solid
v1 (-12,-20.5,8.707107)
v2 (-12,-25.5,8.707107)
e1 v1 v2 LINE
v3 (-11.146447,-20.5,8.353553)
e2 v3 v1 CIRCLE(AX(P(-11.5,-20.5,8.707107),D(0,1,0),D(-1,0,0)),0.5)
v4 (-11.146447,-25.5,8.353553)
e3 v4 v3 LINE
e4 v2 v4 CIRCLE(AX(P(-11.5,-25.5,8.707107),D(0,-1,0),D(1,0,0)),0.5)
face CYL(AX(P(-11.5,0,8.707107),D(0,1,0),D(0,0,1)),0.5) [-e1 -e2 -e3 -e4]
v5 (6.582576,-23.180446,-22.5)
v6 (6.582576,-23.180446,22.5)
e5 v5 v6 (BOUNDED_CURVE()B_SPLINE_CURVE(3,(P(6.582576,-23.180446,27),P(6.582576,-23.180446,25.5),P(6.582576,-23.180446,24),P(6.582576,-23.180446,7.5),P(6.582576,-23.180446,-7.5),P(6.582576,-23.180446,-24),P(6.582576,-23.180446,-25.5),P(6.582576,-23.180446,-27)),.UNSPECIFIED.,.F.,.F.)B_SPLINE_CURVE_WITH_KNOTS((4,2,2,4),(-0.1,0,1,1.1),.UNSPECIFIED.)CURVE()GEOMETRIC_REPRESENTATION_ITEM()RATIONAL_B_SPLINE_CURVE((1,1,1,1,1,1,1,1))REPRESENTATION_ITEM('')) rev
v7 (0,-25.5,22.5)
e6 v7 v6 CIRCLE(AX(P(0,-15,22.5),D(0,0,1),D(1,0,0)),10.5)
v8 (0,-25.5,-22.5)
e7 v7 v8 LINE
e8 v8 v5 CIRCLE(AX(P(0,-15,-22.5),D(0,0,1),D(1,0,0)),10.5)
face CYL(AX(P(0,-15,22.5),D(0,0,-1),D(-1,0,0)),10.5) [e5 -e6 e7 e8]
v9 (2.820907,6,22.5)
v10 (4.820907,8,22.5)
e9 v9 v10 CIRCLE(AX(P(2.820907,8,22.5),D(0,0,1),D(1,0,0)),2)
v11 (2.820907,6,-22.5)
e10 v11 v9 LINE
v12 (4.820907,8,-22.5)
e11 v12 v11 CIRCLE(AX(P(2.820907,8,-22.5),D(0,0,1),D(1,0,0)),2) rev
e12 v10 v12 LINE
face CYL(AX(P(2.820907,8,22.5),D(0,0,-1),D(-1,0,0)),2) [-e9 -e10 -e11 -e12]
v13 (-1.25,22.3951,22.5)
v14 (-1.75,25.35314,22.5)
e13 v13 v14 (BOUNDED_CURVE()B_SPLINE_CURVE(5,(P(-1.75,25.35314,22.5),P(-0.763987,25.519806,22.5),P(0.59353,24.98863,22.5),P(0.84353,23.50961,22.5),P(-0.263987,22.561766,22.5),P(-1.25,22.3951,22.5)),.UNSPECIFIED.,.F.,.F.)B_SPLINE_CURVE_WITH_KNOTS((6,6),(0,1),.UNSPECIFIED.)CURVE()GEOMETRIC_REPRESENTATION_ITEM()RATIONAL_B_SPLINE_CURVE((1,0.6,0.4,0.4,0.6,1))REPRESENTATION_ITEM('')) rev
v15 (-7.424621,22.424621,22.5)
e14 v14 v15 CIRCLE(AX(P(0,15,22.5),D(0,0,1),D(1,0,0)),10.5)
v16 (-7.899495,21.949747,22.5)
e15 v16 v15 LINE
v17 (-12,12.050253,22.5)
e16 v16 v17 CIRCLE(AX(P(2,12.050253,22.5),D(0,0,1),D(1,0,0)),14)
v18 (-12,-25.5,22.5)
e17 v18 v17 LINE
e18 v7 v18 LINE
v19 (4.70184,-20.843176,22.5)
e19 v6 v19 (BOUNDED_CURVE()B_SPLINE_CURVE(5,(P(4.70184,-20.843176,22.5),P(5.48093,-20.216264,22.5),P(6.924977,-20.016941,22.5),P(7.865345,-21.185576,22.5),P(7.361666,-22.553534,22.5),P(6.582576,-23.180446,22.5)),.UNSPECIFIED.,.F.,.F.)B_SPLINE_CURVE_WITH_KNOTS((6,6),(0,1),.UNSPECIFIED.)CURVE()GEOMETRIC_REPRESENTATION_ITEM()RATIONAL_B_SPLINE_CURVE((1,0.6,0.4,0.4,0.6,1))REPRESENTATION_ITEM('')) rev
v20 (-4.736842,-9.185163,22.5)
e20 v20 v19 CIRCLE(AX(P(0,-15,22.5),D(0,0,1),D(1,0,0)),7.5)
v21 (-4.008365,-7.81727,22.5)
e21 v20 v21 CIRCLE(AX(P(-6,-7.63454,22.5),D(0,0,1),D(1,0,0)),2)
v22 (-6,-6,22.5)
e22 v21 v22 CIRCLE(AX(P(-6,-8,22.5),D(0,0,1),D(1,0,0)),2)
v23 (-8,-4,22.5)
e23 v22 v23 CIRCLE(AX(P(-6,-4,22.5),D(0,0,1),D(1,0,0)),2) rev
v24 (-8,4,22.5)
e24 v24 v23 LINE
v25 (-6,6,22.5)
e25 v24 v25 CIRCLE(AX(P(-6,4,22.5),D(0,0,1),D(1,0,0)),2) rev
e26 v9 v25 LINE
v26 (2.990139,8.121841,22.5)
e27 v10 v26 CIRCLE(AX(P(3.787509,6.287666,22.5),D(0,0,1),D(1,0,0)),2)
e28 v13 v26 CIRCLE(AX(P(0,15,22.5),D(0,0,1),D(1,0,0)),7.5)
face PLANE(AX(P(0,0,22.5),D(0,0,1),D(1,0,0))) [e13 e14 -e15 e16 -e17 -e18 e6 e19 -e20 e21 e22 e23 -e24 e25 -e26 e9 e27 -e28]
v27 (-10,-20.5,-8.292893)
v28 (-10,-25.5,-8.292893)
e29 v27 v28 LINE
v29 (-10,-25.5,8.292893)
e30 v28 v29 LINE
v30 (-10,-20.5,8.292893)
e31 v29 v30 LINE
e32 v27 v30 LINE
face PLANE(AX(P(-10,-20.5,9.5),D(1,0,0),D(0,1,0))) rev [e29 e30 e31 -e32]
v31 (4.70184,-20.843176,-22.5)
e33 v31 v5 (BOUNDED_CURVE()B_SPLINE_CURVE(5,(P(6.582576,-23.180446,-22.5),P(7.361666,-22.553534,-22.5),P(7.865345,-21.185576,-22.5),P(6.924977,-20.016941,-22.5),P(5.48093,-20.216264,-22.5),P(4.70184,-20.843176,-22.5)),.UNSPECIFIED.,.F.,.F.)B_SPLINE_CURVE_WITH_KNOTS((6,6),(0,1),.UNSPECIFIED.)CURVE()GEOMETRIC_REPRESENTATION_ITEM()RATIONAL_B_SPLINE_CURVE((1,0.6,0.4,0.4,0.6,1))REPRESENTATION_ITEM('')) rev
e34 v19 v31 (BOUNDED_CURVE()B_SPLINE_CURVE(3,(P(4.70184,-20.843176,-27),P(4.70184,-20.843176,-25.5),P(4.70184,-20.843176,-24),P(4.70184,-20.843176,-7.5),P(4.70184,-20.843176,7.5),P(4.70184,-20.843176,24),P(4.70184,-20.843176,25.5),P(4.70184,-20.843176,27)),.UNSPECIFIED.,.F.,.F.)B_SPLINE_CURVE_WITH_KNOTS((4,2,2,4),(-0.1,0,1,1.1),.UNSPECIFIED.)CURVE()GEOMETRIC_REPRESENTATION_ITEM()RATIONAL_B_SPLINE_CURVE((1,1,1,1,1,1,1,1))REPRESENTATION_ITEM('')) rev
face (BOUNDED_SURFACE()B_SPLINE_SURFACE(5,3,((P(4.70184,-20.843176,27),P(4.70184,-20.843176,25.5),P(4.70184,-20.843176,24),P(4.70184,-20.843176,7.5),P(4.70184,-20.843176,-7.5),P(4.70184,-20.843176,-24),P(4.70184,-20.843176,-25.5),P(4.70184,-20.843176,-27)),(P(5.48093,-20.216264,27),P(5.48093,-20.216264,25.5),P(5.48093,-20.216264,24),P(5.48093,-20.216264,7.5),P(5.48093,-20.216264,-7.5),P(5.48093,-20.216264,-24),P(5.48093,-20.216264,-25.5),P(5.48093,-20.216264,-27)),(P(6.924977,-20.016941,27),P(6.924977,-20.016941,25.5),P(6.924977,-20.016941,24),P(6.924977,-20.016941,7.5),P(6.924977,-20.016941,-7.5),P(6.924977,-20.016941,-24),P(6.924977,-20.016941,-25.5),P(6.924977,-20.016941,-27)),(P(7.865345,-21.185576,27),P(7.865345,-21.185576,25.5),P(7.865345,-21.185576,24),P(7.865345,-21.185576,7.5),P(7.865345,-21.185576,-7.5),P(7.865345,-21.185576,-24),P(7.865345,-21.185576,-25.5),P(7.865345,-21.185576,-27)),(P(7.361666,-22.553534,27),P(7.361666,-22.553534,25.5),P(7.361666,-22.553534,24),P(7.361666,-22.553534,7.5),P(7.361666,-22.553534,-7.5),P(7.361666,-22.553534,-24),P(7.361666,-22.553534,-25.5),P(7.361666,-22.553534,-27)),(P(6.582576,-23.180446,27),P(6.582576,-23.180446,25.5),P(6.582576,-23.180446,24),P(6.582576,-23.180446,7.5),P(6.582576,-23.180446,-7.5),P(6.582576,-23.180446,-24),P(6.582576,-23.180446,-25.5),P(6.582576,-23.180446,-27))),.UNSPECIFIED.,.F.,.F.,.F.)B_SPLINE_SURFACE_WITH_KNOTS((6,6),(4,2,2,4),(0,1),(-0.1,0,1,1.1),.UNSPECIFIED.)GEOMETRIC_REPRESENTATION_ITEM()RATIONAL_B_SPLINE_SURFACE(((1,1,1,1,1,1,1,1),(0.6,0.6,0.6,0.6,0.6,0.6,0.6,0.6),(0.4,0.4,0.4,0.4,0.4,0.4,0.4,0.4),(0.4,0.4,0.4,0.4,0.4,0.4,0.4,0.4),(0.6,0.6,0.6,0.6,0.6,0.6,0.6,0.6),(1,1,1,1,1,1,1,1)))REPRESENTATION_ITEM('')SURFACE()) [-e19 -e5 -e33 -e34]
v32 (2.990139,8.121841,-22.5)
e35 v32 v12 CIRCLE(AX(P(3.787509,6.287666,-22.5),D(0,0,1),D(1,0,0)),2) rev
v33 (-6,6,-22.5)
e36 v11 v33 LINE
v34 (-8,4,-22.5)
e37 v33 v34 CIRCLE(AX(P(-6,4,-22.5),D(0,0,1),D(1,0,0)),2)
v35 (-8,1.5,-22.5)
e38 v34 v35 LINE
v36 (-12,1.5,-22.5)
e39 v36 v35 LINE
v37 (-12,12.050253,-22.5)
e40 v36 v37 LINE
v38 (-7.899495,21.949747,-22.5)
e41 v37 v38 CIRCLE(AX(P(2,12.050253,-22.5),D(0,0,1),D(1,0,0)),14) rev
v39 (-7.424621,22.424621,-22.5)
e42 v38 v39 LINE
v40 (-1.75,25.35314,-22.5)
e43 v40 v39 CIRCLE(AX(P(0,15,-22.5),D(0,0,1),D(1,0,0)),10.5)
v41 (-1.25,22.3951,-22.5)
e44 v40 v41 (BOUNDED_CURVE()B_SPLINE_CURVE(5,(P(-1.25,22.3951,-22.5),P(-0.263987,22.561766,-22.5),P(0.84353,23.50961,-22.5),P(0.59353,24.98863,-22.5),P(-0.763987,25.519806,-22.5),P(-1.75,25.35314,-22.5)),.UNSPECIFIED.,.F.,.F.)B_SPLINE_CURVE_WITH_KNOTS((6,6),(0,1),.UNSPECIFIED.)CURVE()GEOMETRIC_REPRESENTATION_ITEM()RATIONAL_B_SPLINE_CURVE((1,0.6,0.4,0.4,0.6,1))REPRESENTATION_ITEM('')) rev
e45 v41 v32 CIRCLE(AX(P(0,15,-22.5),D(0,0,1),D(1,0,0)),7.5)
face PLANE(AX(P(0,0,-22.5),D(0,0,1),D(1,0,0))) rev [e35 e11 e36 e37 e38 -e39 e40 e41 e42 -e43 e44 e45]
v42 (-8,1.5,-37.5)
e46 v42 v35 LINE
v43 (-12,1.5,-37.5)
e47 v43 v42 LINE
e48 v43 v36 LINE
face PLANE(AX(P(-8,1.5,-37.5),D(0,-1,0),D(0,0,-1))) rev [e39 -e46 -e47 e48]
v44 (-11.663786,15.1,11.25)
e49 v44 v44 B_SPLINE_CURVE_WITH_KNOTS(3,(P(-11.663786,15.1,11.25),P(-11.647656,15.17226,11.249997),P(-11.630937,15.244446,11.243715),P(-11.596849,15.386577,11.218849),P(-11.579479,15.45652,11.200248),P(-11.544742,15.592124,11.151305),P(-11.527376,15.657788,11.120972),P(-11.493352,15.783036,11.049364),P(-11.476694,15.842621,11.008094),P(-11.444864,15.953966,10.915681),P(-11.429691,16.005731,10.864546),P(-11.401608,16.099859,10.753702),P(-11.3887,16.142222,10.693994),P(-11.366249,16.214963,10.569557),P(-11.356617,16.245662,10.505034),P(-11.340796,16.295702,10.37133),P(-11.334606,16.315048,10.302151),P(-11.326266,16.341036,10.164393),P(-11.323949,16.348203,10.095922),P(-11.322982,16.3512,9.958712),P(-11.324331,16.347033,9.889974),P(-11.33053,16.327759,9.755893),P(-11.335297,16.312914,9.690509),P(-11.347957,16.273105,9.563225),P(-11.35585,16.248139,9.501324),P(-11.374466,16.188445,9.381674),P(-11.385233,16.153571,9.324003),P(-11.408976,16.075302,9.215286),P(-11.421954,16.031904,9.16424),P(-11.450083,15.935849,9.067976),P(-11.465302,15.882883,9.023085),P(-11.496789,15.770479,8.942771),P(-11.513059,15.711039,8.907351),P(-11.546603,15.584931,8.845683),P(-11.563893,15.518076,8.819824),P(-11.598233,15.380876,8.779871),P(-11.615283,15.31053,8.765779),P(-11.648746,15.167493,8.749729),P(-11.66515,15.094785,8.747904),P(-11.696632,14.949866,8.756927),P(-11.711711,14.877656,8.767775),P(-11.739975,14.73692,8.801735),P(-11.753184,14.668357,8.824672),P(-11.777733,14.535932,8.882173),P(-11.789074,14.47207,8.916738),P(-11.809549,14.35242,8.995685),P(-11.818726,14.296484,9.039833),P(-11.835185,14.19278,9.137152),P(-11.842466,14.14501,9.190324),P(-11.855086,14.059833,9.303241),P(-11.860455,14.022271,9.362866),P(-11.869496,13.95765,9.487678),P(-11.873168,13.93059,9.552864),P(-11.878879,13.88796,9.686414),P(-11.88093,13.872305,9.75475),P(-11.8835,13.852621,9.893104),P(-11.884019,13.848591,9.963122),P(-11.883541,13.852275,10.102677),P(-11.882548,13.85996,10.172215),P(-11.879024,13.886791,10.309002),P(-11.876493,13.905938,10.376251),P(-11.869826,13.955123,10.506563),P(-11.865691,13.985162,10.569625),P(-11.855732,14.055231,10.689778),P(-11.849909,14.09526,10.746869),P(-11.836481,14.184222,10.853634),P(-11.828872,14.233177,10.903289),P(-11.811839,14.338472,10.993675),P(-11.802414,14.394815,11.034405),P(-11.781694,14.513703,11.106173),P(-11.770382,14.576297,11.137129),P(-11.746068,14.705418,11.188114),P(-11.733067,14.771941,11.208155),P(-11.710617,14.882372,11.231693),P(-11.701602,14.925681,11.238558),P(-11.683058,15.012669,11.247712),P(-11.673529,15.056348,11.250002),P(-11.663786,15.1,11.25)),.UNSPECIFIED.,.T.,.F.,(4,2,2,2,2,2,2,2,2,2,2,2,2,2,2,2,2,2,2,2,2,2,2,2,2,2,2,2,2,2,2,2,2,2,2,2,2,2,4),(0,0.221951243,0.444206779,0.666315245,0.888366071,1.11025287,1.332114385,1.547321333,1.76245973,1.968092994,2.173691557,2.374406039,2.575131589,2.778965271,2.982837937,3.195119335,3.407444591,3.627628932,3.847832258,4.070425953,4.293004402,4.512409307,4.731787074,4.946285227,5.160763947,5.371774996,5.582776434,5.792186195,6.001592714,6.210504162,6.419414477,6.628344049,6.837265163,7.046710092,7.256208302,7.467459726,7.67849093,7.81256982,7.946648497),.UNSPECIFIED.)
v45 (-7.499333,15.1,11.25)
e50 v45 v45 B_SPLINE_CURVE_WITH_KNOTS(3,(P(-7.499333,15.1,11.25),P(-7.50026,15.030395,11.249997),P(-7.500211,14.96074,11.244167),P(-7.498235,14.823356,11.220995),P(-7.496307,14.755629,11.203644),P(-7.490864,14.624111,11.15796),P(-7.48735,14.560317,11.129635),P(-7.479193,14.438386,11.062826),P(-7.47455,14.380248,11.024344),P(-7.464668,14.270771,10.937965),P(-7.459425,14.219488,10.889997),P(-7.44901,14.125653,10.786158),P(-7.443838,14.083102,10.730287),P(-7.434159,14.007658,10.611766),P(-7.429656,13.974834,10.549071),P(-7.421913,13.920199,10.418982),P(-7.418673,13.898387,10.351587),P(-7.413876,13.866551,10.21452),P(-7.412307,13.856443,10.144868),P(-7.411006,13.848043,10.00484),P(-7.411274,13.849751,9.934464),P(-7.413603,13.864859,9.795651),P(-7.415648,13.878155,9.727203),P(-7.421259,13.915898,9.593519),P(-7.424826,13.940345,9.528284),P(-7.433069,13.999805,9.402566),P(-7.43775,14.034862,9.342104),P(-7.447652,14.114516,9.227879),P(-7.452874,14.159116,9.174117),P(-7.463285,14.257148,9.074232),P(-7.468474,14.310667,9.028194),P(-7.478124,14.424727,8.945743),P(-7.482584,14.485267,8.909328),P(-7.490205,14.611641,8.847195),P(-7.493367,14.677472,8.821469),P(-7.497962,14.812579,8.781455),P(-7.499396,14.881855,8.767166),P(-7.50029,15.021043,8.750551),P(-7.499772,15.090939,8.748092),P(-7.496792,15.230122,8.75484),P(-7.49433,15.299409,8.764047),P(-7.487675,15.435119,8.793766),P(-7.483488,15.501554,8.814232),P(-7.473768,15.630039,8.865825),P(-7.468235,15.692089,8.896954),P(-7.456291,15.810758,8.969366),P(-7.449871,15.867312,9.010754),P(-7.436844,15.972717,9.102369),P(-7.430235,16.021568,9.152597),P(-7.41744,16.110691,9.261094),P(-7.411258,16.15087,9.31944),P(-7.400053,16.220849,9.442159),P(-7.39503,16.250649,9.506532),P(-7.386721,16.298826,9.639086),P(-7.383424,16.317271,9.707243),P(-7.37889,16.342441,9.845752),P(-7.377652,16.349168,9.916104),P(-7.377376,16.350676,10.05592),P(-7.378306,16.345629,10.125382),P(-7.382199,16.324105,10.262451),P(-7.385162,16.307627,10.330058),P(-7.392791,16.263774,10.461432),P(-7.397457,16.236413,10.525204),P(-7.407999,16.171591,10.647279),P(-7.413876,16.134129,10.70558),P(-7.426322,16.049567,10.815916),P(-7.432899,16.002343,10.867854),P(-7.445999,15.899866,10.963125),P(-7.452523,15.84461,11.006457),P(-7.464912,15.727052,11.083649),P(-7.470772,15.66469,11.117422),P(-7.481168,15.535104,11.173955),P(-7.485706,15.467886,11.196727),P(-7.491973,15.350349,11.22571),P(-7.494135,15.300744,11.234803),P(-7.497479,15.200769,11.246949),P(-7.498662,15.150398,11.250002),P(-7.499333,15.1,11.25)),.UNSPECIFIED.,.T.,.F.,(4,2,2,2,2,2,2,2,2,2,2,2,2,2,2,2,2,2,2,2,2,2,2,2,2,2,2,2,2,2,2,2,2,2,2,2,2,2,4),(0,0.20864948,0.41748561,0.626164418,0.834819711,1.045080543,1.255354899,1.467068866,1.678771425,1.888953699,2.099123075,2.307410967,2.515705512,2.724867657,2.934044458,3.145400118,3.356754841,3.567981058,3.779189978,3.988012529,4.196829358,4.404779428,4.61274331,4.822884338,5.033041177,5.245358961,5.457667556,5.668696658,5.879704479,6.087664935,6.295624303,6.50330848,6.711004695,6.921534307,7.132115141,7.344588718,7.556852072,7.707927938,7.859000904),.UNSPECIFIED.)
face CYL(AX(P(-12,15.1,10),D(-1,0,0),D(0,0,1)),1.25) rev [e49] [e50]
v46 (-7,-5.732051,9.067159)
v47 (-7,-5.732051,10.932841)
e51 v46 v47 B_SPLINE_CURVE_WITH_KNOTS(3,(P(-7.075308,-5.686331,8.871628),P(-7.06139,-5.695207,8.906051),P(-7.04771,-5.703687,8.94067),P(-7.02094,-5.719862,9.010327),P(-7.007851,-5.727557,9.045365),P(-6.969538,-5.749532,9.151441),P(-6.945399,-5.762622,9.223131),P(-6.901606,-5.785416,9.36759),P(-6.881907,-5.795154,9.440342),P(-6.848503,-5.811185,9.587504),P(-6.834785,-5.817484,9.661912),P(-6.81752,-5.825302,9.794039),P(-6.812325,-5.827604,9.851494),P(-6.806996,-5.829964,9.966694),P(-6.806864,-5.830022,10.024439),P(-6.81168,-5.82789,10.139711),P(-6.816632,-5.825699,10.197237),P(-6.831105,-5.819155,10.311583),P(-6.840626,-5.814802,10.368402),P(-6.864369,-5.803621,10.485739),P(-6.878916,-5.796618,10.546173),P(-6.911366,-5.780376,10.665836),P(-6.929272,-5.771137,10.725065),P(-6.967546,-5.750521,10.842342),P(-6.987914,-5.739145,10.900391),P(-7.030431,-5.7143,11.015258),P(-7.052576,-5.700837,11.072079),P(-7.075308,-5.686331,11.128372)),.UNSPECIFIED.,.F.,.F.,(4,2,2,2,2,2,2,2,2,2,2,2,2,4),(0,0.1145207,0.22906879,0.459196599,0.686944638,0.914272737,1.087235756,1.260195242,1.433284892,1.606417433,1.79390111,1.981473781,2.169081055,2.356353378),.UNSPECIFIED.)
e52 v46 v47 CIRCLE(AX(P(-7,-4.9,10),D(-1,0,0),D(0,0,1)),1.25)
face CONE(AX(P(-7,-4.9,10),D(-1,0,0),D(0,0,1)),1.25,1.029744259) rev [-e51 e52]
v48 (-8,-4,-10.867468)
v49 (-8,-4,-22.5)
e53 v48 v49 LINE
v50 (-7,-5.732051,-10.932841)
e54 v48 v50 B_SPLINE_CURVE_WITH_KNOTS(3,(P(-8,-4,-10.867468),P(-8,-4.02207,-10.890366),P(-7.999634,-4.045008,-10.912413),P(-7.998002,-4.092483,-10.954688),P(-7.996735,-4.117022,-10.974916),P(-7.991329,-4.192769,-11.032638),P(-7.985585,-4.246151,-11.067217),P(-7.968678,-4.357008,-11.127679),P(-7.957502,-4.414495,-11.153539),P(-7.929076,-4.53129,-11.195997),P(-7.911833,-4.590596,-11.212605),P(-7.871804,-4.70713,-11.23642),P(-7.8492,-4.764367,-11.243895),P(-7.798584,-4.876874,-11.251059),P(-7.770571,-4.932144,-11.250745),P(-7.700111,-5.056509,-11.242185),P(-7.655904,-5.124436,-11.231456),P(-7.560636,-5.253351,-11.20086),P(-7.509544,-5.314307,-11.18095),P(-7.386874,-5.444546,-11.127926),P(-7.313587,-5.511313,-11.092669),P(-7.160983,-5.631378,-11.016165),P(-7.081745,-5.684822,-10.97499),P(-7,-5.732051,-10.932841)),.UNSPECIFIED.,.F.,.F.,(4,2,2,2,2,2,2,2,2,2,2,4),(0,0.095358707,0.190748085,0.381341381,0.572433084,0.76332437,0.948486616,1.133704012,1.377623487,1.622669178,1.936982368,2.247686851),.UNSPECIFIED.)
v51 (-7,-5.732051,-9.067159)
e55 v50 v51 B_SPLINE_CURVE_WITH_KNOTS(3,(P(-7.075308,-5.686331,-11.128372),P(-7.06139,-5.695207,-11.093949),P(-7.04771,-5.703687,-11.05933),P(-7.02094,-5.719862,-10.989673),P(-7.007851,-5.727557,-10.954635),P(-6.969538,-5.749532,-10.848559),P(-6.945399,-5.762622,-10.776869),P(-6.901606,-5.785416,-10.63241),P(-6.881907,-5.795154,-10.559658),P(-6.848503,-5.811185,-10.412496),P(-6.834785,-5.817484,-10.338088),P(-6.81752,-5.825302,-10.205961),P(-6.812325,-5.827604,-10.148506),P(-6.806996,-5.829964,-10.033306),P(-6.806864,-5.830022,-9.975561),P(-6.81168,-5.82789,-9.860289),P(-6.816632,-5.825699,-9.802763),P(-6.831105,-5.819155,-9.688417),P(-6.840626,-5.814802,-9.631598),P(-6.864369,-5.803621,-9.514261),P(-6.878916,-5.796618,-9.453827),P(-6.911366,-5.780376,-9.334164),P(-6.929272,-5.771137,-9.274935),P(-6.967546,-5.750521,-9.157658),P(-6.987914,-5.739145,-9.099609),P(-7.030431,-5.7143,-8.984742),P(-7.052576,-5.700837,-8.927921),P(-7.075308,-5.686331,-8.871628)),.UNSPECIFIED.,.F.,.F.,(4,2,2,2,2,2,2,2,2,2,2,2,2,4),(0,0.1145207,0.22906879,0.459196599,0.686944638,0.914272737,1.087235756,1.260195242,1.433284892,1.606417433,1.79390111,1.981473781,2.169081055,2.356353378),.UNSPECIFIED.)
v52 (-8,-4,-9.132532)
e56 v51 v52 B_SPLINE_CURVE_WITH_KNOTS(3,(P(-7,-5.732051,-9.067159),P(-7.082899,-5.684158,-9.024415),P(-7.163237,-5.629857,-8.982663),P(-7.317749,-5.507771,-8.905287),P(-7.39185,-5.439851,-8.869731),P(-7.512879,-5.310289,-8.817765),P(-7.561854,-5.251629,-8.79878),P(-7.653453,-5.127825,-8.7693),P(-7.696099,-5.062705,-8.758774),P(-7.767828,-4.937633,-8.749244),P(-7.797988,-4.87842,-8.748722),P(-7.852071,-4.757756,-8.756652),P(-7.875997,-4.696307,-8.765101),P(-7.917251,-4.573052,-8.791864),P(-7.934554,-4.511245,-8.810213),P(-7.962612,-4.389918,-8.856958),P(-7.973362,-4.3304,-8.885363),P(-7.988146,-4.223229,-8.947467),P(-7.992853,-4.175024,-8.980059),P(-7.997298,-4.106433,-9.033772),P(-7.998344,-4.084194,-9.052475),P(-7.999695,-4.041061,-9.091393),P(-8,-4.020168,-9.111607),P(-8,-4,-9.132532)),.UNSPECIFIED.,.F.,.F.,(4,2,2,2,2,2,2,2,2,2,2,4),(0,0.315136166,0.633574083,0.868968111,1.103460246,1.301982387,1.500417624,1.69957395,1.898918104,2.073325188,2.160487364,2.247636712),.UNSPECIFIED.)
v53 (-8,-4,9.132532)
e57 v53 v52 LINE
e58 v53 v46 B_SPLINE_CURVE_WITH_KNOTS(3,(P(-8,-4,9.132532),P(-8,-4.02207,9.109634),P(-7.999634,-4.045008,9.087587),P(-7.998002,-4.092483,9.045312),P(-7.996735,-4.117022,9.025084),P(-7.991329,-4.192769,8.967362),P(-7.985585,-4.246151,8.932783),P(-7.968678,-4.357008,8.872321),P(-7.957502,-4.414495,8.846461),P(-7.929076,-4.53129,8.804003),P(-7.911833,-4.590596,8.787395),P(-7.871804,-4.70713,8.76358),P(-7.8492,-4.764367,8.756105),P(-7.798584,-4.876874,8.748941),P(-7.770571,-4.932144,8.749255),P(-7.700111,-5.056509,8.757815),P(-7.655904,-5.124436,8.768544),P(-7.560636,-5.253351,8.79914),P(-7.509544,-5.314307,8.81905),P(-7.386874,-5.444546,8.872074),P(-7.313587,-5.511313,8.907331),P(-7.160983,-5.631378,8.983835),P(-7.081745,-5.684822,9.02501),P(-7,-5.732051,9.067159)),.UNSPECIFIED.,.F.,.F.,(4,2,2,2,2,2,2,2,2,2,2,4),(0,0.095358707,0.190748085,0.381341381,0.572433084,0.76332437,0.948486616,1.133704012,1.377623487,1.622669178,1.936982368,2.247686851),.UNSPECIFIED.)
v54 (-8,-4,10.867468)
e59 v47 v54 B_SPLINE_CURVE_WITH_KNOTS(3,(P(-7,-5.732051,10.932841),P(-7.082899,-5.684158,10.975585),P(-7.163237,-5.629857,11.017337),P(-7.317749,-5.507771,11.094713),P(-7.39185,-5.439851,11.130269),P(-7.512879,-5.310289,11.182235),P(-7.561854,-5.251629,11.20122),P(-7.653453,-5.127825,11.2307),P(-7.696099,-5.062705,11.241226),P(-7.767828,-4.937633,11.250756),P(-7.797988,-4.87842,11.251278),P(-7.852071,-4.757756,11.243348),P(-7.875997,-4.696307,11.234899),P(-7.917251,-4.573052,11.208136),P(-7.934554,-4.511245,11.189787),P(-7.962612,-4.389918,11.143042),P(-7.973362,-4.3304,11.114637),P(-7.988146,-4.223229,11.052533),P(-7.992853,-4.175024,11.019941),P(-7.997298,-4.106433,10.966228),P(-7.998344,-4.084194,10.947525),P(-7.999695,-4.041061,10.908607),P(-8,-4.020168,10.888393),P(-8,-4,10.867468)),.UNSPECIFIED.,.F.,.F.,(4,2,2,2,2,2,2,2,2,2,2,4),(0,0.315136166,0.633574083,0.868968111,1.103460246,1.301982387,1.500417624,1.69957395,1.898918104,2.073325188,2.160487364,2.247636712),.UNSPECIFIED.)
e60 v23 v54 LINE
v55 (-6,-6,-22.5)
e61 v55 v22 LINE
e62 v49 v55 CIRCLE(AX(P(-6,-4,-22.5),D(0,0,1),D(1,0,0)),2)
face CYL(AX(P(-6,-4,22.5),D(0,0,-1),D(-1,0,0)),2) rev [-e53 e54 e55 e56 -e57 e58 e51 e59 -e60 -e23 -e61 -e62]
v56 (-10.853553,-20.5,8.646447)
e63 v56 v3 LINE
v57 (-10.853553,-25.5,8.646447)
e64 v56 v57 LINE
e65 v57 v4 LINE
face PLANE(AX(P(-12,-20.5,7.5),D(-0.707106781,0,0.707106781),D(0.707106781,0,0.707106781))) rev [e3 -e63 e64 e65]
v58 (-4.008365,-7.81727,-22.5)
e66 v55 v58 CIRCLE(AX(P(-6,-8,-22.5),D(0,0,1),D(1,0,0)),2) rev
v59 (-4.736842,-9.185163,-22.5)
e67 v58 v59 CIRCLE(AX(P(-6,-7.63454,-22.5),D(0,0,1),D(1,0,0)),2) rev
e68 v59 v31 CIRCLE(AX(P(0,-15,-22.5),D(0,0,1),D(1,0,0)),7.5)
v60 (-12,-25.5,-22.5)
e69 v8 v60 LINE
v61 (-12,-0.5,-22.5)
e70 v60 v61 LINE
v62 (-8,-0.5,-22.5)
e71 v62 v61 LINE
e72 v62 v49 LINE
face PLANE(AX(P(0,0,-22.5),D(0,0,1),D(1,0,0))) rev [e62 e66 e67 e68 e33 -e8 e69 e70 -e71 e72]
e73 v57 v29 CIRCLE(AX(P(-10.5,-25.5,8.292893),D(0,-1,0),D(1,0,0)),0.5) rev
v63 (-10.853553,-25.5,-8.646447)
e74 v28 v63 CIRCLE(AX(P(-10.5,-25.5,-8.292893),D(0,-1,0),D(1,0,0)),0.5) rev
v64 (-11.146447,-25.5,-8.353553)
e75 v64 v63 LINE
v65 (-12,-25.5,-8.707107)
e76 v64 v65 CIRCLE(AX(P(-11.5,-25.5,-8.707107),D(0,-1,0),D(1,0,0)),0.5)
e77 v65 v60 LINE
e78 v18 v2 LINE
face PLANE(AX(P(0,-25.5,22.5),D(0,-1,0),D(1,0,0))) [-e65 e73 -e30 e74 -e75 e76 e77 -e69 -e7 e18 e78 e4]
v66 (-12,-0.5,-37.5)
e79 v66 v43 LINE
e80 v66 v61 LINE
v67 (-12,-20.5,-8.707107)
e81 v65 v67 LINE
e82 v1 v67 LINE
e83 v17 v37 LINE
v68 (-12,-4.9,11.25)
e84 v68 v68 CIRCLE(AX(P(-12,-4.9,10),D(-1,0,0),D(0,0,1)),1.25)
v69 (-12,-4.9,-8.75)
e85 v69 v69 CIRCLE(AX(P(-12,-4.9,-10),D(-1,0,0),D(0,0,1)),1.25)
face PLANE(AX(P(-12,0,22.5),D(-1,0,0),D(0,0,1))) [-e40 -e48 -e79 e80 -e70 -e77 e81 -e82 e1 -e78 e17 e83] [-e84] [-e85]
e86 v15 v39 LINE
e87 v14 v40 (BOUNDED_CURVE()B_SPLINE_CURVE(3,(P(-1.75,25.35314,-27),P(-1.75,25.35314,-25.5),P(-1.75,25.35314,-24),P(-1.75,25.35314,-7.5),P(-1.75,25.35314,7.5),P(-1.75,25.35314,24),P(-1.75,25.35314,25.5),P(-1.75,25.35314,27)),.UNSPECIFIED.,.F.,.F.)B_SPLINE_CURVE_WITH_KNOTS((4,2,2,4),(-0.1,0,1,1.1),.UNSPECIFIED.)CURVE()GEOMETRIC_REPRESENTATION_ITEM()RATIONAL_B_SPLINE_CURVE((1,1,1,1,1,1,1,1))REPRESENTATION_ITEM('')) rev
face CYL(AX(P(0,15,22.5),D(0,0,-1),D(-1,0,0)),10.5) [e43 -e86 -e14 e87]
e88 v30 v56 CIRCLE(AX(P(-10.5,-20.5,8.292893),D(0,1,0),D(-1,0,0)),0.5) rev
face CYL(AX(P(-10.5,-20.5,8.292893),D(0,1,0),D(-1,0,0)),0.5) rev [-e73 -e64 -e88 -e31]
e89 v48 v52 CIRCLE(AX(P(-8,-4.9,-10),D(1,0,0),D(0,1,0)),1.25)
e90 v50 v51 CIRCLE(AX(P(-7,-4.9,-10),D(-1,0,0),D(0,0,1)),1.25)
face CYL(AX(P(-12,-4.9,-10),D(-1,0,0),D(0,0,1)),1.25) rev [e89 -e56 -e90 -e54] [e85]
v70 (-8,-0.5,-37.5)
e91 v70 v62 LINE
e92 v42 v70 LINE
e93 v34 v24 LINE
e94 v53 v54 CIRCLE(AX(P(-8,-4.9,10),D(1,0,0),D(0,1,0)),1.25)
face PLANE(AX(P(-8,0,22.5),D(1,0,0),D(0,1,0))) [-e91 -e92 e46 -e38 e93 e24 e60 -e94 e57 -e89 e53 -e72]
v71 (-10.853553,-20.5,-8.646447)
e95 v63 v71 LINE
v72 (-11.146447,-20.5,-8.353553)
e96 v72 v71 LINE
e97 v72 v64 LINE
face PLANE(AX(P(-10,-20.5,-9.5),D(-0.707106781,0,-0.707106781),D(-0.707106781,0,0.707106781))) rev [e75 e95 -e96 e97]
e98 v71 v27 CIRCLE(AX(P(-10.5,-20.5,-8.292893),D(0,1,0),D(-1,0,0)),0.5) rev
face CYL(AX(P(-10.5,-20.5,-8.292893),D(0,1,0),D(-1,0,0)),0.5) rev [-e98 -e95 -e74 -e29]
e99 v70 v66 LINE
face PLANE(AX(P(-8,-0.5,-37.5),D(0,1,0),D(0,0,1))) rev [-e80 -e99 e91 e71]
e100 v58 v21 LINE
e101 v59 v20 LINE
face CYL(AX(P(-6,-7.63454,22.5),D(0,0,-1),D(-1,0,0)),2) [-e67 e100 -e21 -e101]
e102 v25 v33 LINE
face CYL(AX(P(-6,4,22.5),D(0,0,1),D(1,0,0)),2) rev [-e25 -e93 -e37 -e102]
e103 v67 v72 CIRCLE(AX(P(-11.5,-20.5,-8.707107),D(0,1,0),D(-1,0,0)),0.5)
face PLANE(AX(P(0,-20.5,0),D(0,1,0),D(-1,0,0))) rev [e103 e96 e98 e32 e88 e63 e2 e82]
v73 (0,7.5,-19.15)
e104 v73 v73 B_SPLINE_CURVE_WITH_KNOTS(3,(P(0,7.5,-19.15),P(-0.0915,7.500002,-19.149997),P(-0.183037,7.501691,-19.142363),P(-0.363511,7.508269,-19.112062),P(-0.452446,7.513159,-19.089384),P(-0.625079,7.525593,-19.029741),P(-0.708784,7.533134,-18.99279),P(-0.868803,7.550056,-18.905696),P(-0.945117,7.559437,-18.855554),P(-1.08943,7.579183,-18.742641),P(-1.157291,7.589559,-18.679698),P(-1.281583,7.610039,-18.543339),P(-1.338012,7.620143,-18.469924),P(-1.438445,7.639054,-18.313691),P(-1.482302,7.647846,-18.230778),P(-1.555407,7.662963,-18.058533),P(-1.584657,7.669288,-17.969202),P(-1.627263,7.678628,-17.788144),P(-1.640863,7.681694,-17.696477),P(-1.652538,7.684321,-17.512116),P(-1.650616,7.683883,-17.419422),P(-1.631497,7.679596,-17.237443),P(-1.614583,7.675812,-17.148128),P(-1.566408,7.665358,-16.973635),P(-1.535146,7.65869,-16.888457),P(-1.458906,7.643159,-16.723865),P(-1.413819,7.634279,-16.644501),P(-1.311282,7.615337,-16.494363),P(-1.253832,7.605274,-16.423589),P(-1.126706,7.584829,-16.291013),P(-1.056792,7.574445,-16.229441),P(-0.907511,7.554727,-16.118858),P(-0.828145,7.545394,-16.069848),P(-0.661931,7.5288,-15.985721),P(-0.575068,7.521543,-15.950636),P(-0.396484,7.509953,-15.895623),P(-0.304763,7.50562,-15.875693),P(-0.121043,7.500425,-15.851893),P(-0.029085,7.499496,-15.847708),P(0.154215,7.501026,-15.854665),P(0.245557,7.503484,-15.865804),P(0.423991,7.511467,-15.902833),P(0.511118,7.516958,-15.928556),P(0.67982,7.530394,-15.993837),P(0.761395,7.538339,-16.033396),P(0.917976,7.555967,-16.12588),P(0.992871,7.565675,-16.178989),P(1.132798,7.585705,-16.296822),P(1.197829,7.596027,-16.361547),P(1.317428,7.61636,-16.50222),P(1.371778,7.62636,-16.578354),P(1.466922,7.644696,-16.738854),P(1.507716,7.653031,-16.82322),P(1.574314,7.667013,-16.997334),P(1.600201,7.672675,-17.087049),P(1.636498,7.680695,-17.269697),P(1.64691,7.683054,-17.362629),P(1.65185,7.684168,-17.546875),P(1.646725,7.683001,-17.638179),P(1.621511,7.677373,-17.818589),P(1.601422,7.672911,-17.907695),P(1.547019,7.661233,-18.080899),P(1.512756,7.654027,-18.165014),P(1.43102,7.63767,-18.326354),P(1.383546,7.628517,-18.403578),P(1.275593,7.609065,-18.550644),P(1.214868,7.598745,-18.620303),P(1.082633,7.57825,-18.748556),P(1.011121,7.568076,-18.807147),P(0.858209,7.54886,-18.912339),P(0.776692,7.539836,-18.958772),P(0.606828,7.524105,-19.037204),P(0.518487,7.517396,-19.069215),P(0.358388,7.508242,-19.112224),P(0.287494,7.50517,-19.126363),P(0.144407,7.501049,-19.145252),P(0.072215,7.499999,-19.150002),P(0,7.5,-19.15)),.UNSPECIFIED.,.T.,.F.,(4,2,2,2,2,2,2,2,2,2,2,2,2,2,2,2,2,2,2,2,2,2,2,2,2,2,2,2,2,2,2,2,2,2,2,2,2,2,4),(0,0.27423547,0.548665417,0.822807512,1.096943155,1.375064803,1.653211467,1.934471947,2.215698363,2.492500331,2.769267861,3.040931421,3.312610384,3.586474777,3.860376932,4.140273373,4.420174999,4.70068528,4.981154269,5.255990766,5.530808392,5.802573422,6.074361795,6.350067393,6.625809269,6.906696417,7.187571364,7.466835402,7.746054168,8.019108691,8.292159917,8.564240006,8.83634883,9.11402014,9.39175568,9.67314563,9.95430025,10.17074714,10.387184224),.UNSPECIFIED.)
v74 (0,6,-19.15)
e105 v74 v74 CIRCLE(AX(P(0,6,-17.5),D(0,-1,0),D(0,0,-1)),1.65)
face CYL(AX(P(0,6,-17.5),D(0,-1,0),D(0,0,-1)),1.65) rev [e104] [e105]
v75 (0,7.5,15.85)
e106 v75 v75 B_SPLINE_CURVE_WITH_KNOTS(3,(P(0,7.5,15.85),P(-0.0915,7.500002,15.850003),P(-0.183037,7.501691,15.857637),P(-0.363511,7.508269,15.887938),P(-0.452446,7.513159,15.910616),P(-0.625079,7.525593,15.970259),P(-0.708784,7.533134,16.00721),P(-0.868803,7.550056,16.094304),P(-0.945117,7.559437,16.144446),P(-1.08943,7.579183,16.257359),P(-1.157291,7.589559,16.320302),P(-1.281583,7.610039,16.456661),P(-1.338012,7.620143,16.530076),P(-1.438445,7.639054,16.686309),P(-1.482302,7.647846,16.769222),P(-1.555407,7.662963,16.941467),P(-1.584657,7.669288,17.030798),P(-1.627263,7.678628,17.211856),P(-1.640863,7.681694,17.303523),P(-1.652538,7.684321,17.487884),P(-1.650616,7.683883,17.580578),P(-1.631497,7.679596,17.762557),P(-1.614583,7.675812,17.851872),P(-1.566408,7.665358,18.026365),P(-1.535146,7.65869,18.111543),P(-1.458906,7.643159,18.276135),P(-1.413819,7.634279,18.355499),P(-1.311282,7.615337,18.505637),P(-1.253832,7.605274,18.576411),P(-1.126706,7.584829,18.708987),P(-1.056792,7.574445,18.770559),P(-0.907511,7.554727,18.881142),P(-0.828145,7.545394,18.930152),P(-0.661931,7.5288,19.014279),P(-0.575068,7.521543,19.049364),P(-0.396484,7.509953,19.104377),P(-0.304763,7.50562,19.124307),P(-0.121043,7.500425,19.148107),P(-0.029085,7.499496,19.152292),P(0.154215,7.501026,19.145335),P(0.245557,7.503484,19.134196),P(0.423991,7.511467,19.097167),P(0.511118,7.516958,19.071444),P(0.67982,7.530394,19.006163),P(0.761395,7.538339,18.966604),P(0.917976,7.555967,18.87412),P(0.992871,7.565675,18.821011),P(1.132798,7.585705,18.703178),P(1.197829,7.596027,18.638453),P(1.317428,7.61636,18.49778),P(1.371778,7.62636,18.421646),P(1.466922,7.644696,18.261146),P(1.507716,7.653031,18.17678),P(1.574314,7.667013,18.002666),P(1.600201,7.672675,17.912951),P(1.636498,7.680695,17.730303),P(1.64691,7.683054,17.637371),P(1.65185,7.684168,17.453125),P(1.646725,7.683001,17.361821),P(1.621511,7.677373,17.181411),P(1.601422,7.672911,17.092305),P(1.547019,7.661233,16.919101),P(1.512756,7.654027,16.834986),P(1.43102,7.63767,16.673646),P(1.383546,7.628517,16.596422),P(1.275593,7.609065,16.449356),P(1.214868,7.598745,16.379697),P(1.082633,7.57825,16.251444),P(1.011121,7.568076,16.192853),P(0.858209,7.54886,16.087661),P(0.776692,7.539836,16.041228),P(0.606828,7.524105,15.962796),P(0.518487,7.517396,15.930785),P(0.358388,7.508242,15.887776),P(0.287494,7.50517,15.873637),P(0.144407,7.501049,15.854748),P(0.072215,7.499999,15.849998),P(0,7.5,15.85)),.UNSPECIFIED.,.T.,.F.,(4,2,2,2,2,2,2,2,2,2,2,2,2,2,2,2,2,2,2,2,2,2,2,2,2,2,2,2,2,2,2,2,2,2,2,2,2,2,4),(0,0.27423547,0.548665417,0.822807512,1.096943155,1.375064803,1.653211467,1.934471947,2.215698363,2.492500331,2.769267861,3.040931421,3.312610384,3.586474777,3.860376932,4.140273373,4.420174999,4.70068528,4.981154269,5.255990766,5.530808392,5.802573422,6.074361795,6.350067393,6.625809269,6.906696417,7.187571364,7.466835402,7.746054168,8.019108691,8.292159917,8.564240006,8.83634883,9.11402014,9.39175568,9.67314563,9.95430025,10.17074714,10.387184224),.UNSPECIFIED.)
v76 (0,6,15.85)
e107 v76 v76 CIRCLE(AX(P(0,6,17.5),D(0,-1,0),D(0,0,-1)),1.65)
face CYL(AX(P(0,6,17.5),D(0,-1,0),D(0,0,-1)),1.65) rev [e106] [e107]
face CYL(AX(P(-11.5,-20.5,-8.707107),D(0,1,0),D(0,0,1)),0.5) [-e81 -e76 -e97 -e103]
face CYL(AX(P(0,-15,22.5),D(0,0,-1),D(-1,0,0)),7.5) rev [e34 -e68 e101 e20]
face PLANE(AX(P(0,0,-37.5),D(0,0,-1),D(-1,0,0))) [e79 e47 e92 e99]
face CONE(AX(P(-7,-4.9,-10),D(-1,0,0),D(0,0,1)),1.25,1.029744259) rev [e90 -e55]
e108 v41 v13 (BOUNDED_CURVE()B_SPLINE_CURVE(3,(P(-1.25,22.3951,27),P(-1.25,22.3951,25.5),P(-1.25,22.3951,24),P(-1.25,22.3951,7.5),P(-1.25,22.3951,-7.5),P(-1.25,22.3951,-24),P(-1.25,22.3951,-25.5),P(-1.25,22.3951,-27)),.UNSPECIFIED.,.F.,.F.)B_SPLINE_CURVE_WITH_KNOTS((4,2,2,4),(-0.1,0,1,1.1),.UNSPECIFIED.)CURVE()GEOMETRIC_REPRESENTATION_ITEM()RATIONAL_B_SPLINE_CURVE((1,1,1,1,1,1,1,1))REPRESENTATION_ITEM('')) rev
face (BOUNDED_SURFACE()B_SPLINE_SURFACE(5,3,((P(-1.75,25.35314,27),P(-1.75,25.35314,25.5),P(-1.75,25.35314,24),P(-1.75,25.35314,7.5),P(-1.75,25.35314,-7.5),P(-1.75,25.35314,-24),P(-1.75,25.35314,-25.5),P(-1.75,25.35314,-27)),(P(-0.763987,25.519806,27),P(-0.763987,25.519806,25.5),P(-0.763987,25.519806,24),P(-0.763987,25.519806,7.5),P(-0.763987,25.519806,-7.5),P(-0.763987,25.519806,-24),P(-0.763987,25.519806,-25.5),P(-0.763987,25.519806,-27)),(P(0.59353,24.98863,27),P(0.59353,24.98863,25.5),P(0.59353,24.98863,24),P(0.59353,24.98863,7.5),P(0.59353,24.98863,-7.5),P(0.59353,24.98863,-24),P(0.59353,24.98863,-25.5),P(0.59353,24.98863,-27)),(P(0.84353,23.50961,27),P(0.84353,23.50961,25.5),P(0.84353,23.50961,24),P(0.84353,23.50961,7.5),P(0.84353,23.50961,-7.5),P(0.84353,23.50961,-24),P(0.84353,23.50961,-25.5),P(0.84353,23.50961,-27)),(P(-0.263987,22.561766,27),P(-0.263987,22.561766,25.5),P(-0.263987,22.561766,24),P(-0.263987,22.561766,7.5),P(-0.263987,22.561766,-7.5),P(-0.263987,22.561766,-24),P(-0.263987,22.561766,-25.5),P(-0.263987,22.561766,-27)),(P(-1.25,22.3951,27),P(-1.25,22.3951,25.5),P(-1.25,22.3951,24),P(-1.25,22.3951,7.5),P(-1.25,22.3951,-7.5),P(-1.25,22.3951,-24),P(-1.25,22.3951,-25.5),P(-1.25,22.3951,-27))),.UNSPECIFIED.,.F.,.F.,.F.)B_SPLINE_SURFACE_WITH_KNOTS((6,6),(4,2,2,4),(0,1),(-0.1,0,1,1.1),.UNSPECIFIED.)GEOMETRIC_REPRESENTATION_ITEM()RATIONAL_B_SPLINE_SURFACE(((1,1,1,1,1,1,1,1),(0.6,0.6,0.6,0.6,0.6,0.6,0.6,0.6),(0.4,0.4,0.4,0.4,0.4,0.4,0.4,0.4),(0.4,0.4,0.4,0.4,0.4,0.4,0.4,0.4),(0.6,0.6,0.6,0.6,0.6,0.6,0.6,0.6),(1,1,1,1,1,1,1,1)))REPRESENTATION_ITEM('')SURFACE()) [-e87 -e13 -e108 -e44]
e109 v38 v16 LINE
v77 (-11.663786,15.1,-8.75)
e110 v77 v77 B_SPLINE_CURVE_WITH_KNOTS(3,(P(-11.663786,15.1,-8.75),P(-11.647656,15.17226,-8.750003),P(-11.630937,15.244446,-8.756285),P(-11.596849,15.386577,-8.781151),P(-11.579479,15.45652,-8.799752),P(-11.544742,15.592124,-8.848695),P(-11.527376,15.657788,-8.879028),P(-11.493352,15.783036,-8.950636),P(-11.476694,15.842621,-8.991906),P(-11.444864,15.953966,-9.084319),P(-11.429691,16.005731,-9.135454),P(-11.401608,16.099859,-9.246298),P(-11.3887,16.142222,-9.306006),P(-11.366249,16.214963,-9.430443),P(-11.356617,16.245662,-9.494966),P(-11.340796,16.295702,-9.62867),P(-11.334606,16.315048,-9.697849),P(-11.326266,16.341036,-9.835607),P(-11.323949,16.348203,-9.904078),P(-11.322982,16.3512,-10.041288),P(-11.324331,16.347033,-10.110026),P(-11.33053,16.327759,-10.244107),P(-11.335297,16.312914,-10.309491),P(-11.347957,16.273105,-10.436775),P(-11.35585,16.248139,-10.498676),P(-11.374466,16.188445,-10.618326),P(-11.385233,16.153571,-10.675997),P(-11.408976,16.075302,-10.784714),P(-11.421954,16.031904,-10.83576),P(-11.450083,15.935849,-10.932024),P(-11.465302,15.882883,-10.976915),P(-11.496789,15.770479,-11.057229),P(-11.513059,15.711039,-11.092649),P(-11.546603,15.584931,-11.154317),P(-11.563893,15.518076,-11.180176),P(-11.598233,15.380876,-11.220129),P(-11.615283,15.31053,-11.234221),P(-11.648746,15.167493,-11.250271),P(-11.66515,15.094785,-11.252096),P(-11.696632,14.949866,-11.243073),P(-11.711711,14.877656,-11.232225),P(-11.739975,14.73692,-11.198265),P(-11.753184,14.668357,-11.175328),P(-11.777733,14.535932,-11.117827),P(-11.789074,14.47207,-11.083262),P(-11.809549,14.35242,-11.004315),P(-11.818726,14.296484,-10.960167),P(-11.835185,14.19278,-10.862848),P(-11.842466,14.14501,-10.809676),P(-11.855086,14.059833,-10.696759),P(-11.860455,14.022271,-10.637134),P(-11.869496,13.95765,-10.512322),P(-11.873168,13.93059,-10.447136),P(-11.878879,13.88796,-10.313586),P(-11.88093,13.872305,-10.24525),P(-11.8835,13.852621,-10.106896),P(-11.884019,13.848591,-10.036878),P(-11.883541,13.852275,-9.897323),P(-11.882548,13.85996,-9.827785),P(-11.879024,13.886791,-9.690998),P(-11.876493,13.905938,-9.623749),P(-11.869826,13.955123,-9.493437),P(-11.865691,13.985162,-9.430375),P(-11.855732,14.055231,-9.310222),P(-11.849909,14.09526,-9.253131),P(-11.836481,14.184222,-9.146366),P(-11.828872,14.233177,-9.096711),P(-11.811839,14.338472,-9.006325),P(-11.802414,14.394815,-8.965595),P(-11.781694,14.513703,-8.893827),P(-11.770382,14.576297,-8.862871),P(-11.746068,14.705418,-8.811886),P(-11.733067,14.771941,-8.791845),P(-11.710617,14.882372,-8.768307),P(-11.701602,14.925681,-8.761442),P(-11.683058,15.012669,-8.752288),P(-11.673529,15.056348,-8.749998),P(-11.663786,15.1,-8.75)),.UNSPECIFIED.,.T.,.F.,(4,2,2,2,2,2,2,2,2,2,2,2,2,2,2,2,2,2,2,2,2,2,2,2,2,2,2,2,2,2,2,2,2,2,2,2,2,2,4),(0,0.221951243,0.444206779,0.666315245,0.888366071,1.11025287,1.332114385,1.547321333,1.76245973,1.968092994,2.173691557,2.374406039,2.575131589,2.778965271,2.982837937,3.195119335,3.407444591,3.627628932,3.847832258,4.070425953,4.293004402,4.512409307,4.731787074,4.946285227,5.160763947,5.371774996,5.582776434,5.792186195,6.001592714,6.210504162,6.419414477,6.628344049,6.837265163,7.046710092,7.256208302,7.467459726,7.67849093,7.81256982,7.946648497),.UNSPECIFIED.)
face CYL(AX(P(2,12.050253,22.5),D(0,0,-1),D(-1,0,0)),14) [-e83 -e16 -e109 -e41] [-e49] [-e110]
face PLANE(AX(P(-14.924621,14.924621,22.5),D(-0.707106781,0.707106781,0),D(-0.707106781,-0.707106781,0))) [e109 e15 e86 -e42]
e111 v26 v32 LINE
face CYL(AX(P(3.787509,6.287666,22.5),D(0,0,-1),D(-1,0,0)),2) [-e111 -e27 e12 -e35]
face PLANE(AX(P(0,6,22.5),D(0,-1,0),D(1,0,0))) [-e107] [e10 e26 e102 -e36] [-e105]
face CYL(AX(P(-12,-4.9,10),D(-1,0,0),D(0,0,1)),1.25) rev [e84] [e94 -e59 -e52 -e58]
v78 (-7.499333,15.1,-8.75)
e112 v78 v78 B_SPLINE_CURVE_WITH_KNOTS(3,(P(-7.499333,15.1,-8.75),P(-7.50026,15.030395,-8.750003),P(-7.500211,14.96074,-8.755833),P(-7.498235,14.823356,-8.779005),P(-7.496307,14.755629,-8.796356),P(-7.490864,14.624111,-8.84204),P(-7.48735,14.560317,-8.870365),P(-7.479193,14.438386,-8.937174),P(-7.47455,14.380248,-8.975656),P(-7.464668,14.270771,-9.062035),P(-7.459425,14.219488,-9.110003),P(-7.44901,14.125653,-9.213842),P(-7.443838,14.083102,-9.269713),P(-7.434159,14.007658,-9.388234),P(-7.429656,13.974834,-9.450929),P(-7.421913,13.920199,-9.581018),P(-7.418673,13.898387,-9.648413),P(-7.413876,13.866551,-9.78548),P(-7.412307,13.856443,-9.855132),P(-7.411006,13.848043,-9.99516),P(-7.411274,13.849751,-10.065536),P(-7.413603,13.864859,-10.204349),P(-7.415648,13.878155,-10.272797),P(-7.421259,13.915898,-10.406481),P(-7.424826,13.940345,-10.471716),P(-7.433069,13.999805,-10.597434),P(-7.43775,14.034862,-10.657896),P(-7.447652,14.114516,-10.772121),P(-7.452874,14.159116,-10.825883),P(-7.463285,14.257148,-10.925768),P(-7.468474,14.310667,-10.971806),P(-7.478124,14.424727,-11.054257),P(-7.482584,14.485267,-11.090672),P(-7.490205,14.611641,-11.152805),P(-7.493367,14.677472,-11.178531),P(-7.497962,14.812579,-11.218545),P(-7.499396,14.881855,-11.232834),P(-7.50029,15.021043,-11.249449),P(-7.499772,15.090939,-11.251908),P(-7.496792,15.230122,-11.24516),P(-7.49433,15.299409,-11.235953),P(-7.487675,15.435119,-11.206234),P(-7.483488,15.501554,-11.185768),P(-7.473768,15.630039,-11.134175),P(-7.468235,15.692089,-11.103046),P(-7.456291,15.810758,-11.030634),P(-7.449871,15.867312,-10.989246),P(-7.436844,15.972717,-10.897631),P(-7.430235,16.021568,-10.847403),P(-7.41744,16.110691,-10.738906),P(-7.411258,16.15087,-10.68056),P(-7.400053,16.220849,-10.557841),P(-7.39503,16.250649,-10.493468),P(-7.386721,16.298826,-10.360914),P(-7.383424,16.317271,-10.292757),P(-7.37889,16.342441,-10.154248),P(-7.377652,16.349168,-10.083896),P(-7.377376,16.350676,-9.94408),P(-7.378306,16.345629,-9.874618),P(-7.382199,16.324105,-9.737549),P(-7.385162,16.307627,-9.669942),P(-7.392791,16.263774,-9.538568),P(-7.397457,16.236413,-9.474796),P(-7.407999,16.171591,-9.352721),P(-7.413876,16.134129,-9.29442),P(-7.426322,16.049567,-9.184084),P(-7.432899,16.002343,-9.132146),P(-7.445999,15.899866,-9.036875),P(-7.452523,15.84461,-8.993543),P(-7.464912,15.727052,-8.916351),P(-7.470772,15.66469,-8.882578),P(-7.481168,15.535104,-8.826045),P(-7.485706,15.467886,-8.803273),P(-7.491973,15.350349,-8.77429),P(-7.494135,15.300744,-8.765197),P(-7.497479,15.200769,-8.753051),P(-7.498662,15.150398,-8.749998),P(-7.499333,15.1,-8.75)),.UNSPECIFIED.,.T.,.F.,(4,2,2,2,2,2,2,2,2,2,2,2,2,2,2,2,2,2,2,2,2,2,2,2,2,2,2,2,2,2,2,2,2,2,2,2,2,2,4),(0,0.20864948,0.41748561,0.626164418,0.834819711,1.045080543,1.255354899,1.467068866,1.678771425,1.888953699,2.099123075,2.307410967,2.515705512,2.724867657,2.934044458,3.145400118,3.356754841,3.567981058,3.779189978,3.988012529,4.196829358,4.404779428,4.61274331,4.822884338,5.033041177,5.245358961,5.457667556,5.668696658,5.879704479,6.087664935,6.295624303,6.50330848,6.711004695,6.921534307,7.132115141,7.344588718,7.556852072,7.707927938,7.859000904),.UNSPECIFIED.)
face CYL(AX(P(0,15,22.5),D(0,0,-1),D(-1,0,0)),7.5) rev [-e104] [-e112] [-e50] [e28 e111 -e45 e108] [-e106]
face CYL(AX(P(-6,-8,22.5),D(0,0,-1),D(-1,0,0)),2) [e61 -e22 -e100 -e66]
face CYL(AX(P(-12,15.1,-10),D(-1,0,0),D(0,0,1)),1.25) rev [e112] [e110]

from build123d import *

# Parameters (mm, degrees)
BOSS_EXTRUDE1_DEPTH        = 22.5
M4X0_7_TAPPED_HOLE2_REACH  = 42.528
M4X0_7_TAPPED_HOLE2_BORE_R = 1.65
FILLET2_R                  = 2
FILLET3_START              = -23
FILLET3_DEPTH              = 46
FILLET4_START              = -22.5
FILLET4_DEPTH              = 45
FILLET5_R                  = 2
FILLET7_R                  = 14
CUT_EXTRUDE5_DEPTH         = 5
FILLET8_R                  = 0.5
M3X0_5_TAPPED_HOLE1_D      = 2.5
M3X0_5_TAPPED_HOLE1_DEPTH  = 5
M3X0_5_TAPPED_HOLE1_TIP    = 0.751075774
SKETCH20_W                 = 4
SKETCH20_H                 = 2
BOSS_EXTRUDE3_DEPTH        = 15


with BuildPart() as part:
    # Sketch1 → Boss-Extrude1 (new, symmetric)
    with BuildSketch(Plane.XY):
        with BuildLine():
            Line((7.142207986, -17.288856719), (7.142207986, -22.696678834))
            ThreePointArc((7.142207986, -22.696678834), (3.836331075, -24.774076114), (0, -25.5))
            Line((0, -25.5), (-12, -25.5))
            Line((-12, -25.5), (-12, 17.849242405))
            Line((-12, 17.849242405), (-7.424621202, 22.424621202))
            ThreePointArc((-7.424621202, 22.424621202), (-4.01817604, 24.700735091), (0, 25.5))
            Line((0, 25.5), (0, 22.5))
            ThreePointArc((0, 22.5), (-7.047694656, 12.434848925), (4.820907073, 9.254666677))
            Line((4.820907073, 9.254666677), (4.820907073, 6))
            Line((4.820907073, 6), (-8, 6))
            Line((-8, 6), (-8, -6))
            Line((-8, -6), (-4, -6))
            Line((-4, -6), (-4, -8.65571123))
            ThreePointArc((-4, -8.65571123), (-4.593600768, -20.928645038), (7.142207986, -17.288856719))
        make_face()
    extrude(amount=BOSS_EXTRUDE1_DEPTH, both=True)

    # M4x0.7 Tapped Hole2 bore → M4x0.7 Tapped Hole2 (cut, up to next)
    with BuildSketch(Plane(origin=(0, 6, 0), x_dir=(-1, 0, 0), z_dir=(0, -1, 0)), mode=Mode.PRIVATE) as m4x0_7_tapped_hole2_sk1:
        with Locations((0, -17.5)):
            Circle(M4X0_7_TAPPED_HOLE2_BORE_R)
    m4x0_7_tapped_hole2_tool1 = extrude(m4x0_7_tapped_hole2_sk1.sketch, amount=-M4X0_7_TAPPED_HOLE2_REACH, mode=Mode.PRIVATE) & part.part
    # M4x0.7 Tapped Hole2 bore → M4x0.7 Tapped Hole2 (cut, up to next)
    with BuildSketch(Plane(origin=(0, 6, 0), x_dir=(-1, 0, 0), z_dir=(0, -1, 0)), mode=Mode.PRIVATE) as m4x0_7_tapped_hole2_sk2:
        with Locations((0, 17.5)):
            Circle(M4X0_7_TAPPED_HOLE2_BORE_R)
    m4x0_7_tapped_hole2_tool2 = extrude(m4x0_7_tapped_hole2_sk2.sketch, amount=-M4X0_7_TAPPED_HOLE2_REACH, mode=Mode.PRIVATE) & part.part
    add(m4x0_7_tapped_hole2_tool1.solids().sort_by_distance((0, 6, 17.5))[0], mode=Mode.SUBTRACT)
    add(m4x0_7_tapped_hole2_tool2.solids().sort_by_distance((0, 6, -17.5))[0], mode=Mode.SUBTRACT)

    # Fillet2
    # the kernel refuses this fillet: 2 mm, written as the material it adds along each edge
    with BuildSketch(Plane(origin=(-8, -6, 22.5), x_dir=(0, 1, 0), z_dir=(0, 0, -1)), Plane(origin=(-8, 6, 22.5), x_dir=(1, 0, 0), z_dir=(0, 0, -1))) as fillet2_piece_1:
        with BuildLine():
            CenterArc((FILLET2_R, FILLET2_R), FILLET2_R, 180, 90)
            Line((0, FILLET2_R), (0, 0))
            Line((0, 0), (FILLET2_R, 0))
        make_face()
    extrude(amount=45)
    # the kernel refuses this fillet: 2 mm, written as the material it takes off along each edge
    with BuildSketch(Plane(origin=(-4, -8.65571123, -25.052927903), x_dir=(-0.8120954257724025, -0.5835246519552882, 0), z_dir=(0, 0, 1))) as fillet2_2_piece_1:
        with BuildLine():
            CenterArc((1.028312305, -1.996337733), FILLET2_R, 93.46787904, 50.833289284)
            Line((-0.595878546, -0.829288429), (0, 0))
            ThreePointArc((0, 0), (0.453667193, -0.013733502), (0.907334387, 0))
        make_face()
    extrude(amount=50.105855806, mode=Mode.SUBTRACT)
    with BuildSketch(Plane(origin=(-4, -6, -27.5), x_dir=(0, -1, 0), z_dir=(0, 0, 1)), Plane(origin=(4.820907073, 6, 27.5), x_dir=(0, 1, 0), z_dir=(0, 0, -1))) as fillet2_2_piece_2:
        with BuildLine():
            CenterArc((FILLET2_R, -FILLET2_R), FILLET2_R, 90, 90)
            Line((0, -FILLET2_R), (0, 0))
            Line((0, 0), (FILLET2_R, 0))
        make_face()
    extrude(amount=55, mode=Mode.SUBTRACT)

    # Fillet3: read off the stored shape, not the designer's step
    # Fillet3 outline → Fillet3 (cut)
    with BuildSketch(Plane.XY.offset(FILLET3_START)):
        with BuildLine():
            ThreePointArc((0, 25.5), (-0.878075733, 25.463220489), (-1.75, 25.35313962))
            add(Edge.make_bspline(
                [(-1.75, 25.35313962), (-1.340626415, 25.422336386), (-0.839763435, 25.364052085), (-0.332775331, 25.08288536), (1e-09, 24.544131647), (0, 23.874119673)],
                knots=[0, 0, 0, 0, 0, 0, 0.541960109, 0.541960109, 0.541960109, 0.541960109, 0.541960109, 0.541960109], degree=5, weights=[1, 0.783215957, 0.625176065, 0.525880325, 0.485328737, 0.503521301]))
            Line((0, 23.874119673), (0, 25.5))
        make_face()
        with BuildLine():
            Line((0, 22.5), (0, 23.874119673))
            add(Edge.make_bspline(
                [(0, 23.874119673), (-1e-09, 23.344488498), (-0.216926345, 22.902050344), (-0.555121167, 22.607049118), (-0.918235372, 22.451178186), (-1.25, 22.395099729)],
                knots=[0.541960109, 0.541960109, 0.541960109, 0.541960109, 0.541960109, 0.541960109, 1, 1, 1, 1, 1, 1], degree=5, weights=[0.503521301, 0.518896824, 0.576232456, 0.675528195, 0.816784043, 1]))
            ThreePointArc((-1.25, 22.395099729), (-0.627196952, 22.473728921), (0, 22.5))
        make_face()
    extrude(amount=FILLET3_DEPTH, mode=Mode.SUBTRACT)

    # Fillet4: read off the stored shape, not the designer's step
    # Fillet4 outline → Fillet4 (cut)
    with BuildSketch(Plane.XY.offset(FILLET4_START)):
        with BuildLine():
            ThreePointArc((7.142207986, -17.288856719), (6.182933262, -19.245154446), (4.701839989, -20.843175568))
            add(Edge.make_bspline(
                [(4.701839989, -20.843175568), (5.135113998, -20.494532089), (5.812281829, -20.26945545), (6.615008937, -20.444697489), (7.14219213, -21.142606567), (7.142207986, -22.011783319)],
                knots=[0, 0, 0, 0, 0, 0, 0.676183816, 0.676183816, 0.676183816, 0.676183816, 0.676183816, 0.676183816], degree=5, weights=[1, 0.729526474, 0.550497858, 0.462914153, 0.466775358, 0.562081474]))
            Line((7.142207986, -22.011783319), (7.142207986, -17.288856719))
        make_face()
        with BuildLine():
            Line((7.142207986, -22.696678834), (7.142207986, -22.011783319))
            add(Edge.make_bspline(
                [(7.142207986, -22.011783319), (7.142213818, -22.331484727), (7.059225631, -22.61727017), (6.921863818, -22.854436912), (6.756468906, -23.040519024), (6.582575984, -23.180445796)],
                knots=[0.676183816, 0.676183816, 0.676183816, 0.676183816, 0.676183816, 0.676183816, 1, 1, 1, 1, 1, 1], degree=5, weights=[0.562081474, 0.607722411, 0.674334732, 0.761918437, 0.870473526, 1]))
            ThreePointArc((6.582575984, -23.180445796), (6.866653579, -22.943492218), (7.142207986, -22.696678834))
        make_face()
    extrude(amount=FILLET4_DEPTH, mode=Mode.SUBTRACT)

    # Fillet5
    # the kernel refuses this fillet: 2 mm, written as the material it takes off along each edge
    with BuildSketch(Plane(origin=(4.820907073, 9.254666677, 27.882265511), x_dir=(-0.8503705465795661, -0.5261843151500908, 0), z_dir=(0, 0, -1))) as fillet5_piece_1:
        with BuildLine():
            CenterArc((2.439960365, -1.97929278), FILLET5_R, 98.251994966, 54.607083408)
            Line((0.660185926, -1.066931588), (0.624590437, -1.048684364))
            ThreePointArc((0.624590437, -1.048684364), (0.296078141, -0.554513166), (-0.034014822, -0.021047373))
            Line((-0.034014822, -0.021047373), (0.005741083, 0.039585856))
            ThreePointArc((0.005741083, 0.039585856), (1.076453102, -0.037652075), (2.147165121, 0.039585856))
            Line((2.147165121, 0.039585856), (2.152906205, 0))
        make_face()
    extrude(amount=55.764531023, mode=Mode.SUBTRACT)

    # Fillet7
    fillet7_edges = [part.edges().sort_by_distance(p)[0] for p in [
        (-12, 17.849242405, 0),
    ]]
    fillet(fillet7_edges, radius=FILLET7_R)

    # Sketch17 → Cut-Extrude5 (cut)
    with BuildSketch(Plane.XZ.offset(25.5)):
        Polygon((-12, 7.5), (-10, 9.5), (-10, -9.5), (-12, -7.5), align=None)
    extrude(amount=-CUT_EXTRUDE5_DEPTH, mode=Mode.SUBTRACT)

    # Fillet8
    fillet8_edges = [part.edges().sort_by_distance(p)[0] for p in [
        (-12, -23, -7.5),
        (-12, -23, 7.5),
        (-10, -23, 9.5),
        (-10, -23, -9.5),
    ]]
    fillet(fillet8_edges, radius=FILLET8_R)

    # M3x0.5 Tapped Hole1
    with Locations(Plane.ZY.offset(12)):
        with Locations((-10, 15.1), (-10, -4.9), (10, -4.9), (10, 15.1)):
            Hole(M3X0_5_TAPPED_HOLE1_D / 2, depth=M3X0_5_TAPPED_HOLE1_DEPTH)
            with Locations((0, 0, -(M3X0_5_TAPPED_HOLE1_DEPTH + M3X0_5_TAPPED_HOLE1_TIP / 2))):  # 118° drill point
                Cone(0, M3X0_5_TAPPED_HOLE1_D / 2, M3X0_5_TAPPED_HOLE1_TIP, mode=Mode.SUBTRACT)

    # Sketch20 → Boss-Extrude3 (add)
    with BuildSketch(Plane(origin=(0, 0, -22.5), x_dir=(-1, 0, 0), z_dir=(0, 0, -1))):
        with Locations((10, 0.5)):
            Rectangle(SKETCH20_W, SKETCH20_H)
    extrude(amount=BOSS_EXTRUDE3_DEPTH)


solid = part.part
